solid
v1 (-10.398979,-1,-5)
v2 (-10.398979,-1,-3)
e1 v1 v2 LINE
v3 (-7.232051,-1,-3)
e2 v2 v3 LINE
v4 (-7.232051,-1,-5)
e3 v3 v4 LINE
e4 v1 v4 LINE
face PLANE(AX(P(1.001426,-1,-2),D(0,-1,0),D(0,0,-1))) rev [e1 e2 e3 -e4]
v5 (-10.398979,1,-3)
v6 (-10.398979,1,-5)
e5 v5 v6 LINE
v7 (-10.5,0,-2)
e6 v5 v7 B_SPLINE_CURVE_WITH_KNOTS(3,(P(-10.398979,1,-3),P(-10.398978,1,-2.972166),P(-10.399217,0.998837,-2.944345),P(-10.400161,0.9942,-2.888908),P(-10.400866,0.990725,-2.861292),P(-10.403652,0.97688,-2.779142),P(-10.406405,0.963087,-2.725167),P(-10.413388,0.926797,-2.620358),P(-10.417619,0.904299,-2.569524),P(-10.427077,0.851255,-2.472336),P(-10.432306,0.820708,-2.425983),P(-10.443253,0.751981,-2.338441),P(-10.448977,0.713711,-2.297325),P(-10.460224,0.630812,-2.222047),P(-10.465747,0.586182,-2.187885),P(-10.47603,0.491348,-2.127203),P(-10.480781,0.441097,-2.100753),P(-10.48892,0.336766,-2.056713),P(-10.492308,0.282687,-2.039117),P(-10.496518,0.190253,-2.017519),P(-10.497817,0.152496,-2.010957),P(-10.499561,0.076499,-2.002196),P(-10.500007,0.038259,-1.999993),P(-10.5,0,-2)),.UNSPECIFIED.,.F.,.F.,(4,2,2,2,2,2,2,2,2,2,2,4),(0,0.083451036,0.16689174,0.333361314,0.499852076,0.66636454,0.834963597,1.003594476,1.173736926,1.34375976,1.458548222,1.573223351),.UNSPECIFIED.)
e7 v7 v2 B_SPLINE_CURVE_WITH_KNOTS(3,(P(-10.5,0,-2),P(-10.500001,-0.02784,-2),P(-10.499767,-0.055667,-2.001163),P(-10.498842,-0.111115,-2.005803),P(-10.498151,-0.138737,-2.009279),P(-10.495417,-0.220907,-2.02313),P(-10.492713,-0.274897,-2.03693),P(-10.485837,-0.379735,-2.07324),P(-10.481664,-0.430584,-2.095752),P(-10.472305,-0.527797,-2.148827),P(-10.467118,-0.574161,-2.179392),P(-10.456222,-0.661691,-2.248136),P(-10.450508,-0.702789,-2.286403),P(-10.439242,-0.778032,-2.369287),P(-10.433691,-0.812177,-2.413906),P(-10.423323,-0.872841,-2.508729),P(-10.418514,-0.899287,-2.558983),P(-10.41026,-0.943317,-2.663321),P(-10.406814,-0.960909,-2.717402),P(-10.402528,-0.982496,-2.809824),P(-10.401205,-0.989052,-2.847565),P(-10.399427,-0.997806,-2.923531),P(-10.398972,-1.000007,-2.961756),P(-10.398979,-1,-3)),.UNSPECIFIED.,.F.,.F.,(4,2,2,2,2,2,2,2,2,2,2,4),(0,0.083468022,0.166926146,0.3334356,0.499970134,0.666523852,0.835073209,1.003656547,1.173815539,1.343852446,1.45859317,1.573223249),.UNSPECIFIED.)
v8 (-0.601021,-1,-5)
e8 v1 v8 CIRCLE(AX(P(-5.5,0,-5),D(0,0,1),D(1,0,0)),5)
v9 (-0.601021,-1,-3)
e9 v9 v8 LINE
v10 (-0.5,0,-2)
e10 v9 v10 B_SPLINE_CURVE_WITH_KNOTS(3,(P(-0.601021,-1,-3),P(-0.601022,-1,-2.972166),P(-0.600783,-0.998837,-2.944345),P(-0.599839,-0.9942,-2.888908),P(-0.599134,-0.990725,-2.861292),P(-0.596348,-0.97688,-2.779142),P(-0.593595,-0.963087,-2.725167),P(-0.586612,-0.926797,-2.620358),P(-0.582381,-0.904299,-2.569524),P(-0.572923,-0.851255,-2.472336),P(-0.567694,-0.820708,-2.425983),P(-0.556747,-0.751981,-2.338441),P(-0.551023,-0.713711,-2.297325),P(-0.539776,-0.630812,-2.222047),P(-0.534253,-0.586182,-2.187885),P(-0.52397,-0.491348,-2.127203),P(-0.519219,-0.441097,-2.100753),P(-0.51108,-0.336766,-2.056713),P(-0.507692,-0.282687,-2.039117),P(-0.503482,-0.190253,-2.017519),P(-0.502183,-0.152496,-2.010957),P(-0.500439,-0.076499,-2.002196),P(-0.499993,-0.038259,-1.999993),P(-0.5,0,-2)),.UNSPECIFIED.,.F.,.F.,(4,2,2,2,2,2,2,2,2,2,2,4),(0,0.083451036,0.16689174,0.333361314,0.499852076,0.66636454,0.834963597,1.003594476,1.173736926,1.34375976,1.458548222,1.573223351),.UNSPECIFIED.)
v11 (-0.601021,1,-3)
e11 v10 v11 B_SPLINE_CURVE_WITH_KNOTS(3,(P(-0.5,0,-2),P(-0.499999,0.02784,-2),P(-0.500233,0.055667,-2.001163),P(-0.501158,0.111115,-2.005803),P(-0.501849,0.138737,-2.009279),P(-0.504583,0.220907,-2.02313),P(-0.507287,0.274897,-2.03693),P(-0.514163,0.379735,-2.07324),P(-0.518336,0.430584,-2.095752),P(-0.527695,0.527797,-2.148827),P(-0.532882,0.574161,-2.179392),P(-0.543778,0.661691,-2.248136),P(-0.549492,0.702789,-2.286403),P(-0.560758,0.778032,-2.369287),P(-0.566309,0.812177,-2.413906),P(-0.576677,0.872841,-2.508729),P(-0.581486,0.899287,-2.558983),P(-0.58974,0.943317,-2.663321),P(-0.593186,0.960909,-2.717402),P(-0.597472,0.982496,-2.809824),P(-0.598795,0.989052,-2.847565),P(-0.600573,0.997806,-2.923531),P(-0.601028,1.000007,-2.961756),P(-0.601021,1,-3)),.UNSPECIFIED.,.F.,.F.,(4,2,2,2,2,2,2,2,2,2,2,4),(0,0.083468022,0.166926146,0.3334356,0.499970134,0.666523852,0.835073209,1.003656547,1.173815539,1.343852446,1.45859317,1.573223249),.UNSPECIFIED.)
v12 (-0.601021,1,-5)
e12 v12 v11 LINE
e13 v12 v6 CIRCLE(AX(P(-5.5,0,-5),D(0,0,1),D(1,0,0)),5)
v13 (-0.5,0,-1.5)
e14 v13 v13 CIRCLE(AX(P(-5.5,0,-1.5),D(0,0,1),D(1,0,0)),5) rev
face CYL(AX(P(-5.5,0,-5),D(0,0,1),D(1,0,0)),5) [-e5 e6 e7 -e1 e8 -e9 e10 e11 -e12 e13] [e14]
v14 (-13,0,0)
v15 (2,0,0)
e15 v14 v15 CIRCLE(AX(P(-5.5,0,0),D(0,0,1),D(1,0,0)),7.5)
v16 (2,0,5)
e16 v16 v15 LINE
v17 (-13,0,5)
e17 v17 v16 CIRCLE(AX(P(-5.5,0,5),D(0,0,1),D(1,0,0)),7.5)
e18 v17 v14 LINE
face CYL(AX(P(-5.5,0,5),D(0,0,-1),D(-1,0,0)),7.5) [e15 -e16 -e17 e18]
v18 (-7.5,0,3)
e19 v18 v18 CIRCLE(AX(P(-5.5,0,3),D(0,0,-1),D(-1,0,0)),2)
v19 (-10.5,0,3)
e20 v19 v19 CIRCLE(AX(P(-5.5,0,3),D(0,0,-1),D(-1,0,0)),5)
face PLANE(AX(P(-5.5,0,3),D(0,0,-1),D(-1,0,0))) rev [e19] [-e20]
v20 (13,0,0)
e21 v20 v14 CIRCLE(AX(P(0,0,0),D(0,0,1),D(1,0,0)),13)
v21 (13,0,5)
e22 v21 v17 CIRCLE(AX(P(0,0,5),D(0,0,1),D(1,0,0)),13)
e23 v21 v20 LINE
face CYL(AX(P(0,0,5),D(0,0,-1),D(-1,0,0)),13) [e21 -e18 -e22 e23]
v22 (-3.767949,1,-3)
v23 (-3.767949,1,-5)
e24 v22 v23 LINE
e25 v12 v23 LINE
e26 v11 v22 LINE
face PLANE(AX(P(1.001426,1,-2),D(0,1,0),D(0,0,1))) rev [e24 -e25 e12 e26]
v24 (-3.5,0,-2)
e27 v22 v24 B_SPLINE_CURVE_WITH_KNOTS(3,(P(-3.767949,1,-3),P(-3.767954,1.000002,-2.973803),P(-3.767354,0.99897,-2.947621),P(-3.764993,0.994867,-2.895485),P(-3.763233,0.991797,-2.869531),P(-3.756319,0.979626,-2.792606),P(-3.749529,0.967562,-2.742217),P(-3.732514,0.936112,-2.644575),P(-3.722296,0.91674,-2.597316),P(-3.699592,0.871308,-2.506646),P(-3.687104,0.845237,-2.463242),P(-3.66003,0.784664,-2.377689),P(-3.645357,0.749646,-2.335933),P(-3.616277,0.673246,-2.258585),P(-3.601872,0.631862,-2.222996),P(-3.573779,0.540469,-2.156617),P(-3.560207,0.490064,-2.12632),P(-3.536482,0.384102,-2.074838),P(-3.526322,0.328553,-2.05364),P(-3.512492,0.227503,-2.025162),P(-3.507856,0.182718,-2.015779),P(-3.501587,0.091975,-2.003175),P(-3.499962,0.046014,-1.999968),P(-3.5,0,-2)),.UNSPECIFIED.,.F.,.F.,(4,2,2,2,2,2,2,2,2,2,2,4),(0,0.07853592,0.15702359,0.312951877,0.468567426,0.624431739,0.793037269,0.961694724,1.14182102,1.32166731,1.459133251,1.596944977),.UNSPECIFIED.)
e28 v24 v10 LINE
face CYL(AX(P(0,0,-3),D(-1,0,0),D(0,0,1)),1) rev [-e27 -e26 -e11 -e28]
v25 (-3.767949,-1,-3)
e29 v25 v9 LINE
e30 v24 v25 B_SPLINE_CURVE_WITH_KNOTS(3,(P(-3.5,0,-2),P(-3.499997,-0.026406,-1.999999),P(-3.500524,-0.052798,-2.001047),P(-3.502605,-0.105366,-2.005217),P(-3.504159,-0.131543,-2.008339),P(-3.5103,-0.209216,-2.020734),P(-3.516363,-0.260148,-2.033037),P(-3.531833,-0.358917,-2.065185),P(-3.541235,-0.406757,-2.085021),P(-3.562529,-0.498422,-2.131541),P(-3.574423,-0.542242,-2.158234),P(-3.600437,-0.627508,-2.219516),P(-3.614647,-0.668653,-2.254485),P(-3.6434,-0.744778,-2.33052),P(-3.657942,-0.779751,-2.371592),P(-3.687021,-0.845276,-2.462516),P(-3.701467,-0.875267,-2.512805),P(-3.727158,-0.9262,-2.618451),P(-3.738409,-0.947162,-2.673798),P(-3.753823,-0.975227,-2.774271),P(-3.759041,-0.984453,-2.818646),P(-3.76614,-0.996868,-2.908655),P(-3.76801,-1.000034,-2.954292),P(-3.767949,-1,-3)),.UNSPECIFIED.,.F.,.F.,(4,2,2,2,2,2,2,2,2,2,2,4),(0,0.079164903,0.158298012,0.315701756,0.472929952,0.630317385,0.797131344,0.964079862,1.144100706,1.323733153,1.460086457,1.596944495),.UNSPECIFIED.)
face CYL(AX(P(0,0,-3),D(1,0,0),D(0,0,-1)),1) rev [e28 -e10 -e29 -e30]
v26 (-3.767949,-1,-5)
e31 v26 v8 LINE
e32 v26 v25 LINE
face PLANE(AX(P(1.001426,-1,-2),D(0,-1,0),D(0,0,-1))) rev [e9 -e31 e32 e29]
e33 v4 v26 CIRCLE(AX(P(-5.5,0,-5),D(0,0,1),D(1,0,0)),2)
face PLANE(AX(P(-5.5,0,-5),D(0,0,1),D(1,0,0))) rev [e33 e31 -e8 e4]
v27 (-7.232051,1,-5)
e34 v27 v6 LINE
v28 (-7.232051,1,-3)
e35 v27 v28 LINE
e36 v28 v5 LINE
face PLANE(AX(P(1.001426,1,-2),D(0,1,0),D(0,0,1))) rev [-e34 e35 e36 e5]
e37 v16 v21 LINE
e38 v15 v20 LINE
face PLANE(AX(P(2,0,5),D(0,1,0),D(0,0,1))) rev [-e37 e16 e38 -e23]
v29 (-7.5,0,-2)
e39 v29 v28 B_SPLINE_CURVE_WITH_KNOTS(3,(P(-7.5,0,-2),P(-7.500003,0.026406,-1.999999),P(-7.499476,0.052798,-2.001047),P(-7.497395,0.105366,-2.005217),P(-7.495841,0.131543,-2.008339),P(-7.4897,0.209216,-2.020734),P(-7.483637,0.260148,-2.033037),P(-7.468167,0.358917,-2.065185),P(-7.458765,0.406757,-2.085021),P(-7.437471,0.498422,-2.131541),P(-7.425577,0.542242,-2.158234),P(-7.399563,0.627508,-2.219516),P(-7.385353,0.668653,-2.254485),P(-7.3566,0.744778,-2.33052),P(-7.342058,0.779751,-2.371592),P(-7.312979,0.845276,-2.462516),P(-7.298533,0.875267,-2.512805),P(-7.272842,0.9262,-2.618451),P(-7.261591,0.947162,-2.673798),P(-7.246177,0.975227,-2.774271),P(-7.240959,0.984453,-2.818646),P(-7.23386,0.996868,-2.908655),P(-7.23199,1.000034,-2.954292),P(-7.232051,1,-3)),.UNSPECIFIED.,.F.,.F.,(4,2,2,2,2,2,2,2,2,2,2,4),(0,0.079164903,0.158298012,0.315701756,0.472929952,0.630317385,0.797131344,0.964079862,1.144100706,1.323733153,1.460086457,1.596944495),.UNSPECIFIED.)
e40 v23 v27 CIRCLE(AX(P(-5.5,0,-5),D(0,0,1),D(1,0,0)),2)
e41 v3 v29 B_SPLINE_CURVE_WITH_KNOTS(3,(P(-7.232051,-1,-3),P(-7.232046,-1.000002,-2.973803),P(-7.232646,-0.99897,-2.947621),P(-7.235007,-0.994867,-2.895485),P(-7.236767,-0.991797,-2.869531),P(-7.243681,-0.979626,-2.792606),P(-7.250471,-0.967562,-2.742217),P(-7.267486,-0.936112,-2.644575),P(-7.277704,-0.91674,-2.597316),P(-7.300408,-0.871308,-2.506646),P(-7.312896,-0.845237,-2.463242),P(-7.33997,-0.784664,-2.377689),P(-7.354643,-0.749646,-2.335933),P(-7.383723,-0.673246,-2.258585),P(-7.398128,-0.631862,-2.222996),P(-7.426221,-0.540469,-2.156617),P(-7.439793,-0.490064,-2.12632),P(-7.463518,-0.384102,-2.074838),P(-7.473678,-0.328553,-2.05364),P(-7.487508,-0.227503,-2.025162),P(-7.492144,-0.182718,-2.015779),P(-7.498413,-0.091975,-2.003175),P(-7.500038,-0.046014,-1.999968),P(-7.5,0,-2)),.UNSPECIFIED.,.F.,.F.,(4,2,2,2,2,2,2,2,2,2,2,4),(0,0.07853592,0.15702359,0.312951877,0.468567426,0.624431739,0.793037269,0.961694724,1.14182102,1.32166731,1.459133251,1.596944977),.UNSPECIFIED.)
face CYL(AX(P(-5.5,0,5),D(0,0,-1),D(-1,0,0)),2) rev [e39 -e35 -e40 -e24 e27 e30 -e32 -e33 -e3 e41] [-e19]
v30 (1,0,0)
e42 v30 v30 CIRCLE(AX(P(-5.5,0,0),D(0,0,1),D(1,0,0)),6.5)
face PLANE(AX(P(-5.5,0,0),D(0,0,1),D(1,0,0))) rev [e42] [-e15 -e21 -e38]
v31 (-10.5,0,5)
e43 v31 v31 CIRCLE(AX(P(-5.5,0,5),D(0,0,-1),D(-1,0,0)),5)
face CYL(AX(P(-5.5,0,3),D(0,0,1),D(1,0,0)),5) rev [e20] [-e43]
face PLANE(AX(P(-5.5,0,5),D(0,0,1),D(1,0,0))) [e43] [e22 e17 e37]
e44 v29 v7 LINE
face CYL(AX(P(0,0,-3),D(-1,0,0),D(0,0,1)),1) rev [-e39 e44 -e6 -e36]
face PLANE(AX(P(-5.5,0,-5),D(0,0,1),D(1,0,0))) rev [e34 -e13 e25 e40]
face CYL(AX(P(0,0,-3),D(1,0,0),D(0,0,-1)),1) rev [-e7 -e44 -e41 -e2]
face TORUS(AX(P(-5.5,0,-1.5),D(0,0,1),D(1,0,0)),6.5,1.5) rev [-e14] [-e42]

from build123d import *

# Parameters (mm, degrees)
SKETCH1_R           = 2
BOSS_EXTRUDE1_DEPTH = 5
BOSS_EXTRUDE2_START = -5
SKETCH3_R           = 5
SKETCH3_R_2         = 2
BOSS_EXTRUDE2_DEPTH = 5
SKETCH4_W           = 13.002851436
SKETCH4_H           = 2
CUT_EXTRUDE1_DEPTH  = 3
FILLET1_R           = 1
CUT_EXTRUDE2_START  = 2
SKETCH5_R           = 5
CUT_EXTRUDE2_DEPTH  = 2
FILLET2_R           = 1.5


with BuildPart() as part:
    # Sketch1 → Boss-Extrude1 (new body)
    with BuildSketch(Plane.XY):
        with BuildLine():
            Line((2, 0), (13, 0))
            ThreePointArc((13, 0), (0, 13), (-13, 0))
            ThreePointArc((-13, 0), (-5.5, -7.5), (2, 0))
        make_face()
        with Locations((-5.5, 0)):
            Circle(SKETCH1_R, mode=Mode.SUBTRACT)
    extrude(amount=BOSS_EXTRUDE1_DEPTH)

    # Sketch3 → Boss-Extrude2 (add)
    with BuildSketch(Plane.XY.offset(BOSS_EXTRUDE2_START)):
        with Locations((-5.5, 0)):
            Circle(SKETCH3_R)
        with Locations((-5.5, 0)):
            Circle(SKETCH3_R_2, mode=Mode.SUBTRACT)
    extrude(amount=BOSS_EXTRUDE2_DEPTH)

    # Sketch4 → Cut-Extrude1 (cut)
    with BuildSketch(Plane(origin=(0, 0, -5), x_dir=(-1, 0, 0), z_dir=(0, 0, -1))):
        with Locations((5.5, 0)):
            Rectangle(SKETCH4_W, SKETCH4_H)
    extrude(amount=-CUT_EXTRUDE1_DEPTH, mode=Mode.SUBTRACT)

    # Fillet1
    fillet1_edges = [part.edges().sort_by_distance(p)[0] for p in [
        (-8.815515147, 1, -2),
        (-2.184484853, 1, -2),
        (-8.815515147, -1, -2),
        (-2.184484853, -1, -2),
    ]]
    fillet(fillet1_edges, radius=FILLET1_R - 0.0001)  # a hair under: the kernel refuses the full size

    # Sketch5 → Cut-Extrude2 (cut)
    with BuildSketch(Plane(origin=(0, 0, 5), x_dir=(-1, 0, 0), z_dir=(0, 0, -1)).offset(CUT_EXTRUDE2_START)):
        with Locations(Location((5.5, 0, 0), (0, 0, 180))):
            Circle(SKETCH5_R)
    extrude(amount=-CUT_EXTRUDE2_DEPTH, mode=Mode.SUBTRACT)

    # Fillet2
    fillet2_edges = [part.edges().sort_by_distance(p)[0] for p in [
        (-10.5, 0, 0),
    ]]
    fillet(fillet2_edges, radius=FILLET2_R)


solid = part.part
